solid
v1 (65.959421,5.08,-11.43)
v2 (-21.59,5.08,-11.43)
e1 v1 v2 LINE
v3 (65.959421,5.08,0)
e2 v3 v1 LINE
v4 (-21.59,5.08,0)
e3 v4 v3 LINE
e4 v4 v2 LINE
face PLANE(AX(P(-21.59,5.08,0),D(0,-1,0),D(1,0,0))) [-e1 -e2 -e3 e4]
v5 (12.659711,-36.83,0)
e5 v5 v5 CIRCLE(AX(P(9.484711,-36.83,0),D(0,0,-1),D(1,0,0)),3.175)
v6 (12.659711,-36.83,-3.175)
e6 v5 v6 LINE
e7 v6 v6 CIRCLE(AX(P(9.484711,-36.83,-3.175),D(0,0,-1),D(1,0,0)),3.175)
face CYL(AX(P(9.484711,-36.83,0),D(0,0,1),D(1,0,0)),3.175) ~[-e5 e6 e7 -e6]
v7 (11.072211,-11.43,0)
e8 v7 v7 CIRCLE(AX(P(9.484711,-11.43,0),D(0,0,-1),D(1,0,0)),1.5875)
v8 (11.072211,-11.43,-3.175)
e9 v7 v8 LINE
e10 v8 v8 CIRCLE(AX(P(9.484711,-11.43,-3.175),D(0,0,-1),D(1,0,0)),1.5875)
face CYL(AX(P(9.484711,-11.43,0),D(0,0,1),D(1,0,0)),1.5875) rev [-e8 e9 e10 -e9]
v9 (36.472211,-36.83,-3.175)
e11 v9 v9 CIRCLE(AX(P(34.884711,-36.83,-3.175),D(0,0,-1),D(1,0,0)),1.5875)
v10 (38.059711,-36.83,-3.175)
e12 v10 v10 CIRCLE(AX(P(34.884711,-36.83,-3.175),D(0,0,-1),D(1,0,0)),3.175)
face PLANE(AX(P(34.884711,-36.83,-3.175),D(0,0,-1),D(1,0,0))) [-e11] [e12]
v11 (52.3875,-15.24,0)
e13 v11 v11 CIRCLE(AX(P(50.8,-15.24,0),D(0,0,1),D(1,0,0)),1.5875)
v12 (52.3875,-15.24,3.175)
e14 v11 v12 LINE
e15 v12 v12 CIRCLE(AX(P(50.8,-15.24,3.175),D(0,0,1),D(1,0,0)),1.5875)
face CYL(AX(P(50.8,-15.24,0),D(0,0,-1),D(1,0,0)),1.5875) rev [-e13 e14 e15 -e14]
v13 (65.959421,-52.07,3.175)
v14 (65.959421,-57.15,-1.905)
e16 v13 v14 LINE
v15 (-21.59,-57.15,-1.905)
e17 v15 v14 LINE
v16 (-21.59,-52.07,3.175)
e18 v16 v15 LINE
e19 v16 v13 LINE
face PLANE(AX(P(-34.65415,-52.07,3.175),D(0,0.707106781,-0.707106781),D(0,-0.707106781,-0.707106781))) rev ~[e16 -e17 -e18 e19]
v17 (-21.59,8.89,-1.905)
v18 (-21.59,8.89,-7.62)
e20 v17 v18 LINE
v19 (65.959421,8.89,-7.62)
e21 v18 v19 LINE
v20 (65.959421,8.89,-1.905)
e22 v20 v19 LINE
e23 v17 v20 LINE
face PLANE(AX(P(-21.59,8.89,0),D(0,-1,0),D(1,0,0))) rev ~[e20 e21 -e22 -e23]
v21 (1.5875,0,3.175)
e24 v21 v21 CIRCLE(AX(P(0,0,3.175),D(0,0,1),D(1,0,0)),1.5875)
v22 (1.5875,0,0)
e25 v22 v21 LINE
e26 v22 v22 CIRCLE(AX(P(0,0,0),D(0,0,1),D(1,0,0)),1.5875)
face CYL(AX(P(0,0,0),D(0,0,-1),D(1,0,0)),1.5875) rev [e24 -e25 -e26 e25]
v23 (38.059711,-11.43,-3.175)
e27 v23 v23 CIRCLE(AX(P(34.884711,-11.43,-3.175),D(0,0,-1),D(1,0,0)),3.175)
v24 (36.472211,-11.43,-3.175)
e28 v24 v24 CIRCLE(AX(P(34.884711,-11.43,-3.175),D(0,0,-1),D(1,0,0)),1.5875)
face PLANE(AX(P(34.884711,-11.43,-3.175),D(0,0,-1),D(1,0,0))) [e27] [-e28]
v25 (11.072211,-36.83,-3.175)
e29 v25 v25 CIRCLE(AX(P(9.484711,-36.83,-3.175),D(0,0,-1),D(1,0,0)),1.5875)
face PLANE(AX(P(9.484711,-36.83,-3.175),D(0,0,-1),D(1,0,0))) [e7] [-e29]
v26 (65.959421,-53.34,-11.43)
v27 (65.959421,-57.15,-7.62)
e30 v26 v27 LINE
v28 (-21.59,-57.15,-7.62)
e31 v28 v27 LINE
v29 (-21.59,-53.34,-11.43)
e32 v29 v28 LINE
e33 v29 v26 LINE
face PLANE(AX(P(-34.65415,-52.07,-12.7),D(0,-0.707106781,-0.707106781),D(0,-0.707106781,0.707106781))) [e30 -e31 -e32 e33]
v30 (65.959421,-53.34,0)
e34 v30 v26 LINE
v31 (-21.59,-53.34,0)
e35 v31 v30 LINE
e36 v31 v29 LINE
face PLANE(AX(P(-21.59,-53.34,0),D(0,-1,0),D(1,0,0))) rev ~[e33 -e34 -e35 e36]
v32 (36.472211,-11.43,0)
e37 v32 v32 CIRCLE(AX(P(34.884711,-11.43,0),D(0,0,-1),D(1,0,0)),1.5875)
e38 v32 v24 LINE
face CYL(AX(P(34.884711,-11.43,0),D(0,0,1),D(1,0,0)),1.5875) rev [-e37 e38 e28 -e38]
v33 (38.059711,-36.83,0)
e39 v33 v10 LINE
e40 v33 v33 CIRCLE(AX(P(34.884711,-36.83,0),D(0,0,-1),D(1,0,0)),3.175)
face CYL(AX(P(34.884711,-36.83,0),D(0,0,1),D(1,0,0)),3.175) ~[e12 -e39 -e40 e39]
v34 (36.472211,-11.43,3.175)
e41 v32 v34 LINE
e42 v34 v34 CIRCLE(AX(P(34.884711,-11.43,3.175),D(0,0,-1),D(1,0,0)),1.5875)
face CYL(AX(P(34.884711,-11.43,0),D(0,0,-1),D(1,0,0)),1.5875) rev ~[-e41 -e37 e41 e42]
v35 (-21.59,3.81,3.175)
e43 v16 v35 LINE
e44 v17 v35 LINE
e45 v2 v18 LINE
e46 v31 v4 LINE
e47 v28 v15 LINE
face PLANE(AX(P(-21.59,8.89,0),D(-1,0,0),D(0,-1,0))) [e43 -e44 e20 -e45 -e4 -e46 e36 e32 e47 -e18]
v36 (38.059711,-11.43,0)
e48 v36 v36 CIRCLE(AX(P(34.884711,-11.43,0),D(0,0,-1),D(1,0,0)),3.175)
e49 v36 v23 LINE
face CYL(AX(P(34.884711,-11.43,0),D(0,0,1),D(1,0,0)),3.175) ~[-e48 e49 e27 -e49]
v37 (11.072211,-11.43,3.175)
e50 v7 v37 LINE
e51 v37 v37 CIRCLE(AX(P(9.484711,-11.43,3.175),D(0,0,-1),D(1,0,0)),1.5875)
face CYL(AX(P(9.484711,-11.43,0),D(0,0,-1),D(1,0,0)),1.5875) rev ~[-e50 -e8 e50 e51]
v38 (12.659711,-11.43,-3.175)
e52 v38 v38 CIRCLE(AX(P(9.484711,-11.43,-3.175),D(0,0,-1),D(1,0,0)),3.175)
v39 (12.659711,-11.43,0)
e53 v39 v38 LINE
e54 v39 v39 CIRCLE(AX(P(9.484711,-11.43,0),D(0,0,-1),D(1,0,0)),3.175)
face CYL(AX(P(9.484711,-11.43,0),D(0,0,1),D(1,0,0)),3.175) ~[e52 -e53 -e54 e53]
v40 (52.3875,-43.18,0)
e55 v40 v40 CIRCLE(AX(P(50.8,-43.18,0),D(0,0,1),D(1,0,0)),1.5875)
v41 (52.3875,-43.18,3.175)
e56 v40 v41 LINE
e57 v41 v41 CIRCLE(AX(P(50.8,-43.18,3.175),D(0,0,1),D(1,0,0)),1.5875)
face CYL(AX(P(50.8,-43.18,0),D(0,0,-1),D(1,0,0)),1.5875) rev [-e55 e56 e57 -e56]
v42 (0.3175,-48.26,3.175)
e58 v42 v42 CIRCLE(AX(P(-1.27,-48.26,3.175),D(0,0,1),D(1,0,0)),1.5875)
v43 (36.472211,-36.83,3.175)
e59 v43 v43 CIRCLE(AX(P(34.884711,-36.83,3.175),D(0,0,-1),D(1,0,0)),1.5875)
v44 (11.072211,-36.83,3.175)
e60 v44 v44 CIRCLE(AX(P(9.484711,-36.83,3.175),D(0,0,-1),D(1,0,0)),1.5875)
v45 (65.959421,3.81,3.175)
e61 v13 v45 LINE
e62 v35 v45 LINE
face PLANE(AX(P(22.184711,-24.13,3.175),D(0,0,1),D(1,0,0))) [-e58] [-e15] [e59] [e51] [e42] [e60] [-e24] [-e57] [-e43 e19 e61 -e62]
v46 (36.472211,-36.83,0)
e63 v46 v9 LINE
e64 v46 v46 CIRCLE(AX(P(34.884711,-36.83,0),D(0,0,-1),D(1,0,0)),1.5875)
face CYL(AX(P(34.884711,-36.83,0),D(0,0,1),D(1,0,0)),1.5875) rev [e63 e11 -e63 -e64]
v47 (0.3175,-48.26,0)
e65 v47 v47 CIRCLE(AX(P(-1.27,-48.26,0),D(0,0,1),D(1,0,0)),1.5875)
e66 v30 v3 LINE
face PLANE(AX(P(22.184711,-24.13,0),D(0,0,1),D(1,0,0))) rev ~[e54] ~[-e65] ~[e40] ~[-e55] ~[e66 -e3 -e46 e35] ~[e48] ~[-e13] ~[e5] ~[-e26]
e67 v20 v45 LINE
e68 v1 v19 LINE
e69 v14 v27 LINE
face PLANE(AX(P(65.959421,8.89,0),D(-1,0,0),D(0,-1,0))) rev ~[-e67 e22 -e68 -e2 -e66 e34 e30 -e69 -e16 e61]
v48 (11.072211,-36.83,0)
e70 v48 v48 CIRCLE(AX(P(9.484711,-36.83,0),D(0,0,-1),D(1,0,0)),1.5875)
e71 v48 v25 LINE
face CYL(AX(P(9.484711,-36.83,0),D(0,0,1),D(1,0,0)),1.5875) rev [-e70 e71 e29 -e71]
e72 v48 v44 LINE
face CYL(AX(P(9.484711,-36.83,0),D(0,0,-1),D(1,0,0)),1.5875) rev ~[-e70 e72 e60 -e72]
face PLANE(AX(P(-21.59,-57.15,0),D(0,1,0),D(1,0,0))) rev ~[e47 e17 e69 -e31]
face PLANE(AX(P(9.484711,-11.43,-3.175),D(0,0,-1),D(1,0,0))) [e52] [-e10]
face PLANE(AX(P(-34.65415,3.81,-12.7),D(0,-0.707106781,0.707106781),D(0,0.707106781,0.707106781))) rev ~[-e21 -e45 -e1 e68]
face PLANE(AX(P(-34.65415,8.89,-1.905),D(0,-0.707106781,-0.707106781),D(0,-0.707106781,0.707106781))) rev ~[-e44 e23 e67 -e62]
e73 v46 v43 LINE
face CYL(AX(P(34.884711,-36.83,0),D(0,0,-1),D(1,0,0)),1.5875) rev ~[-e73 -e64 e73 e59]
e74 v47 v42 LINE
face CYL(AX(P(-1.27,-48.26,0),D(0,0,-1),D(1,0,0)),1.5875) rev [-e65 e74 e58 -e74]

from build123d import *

# Parameters (mm, degrees)
F0_W        = 87.5494211584
F0_H        = 66.04
F0_R        = 1.5875
F1_DEPTH    = 3.175
F2_R        = 3.175
F2_R_2      = 1.5875
F3_DEPTH    = 3.175
F4_DEPTH    = 25.4
F5_W        = 87.5494211584
F5_H        = 3.81
F6_DEPTH    = 12.7
F7_T1_DEPTH = 113.6777203162


# Not quite as in the source:
# - a fillet or chamfer that OpenCascade refuses, or shapes differently, is made with other operations: its cross-section is extruded or revolved along the edge and cut away or added


with BuildPart() as f1:
    # F0 (on Top) → F1 (new body)
    with BuildSketch(Plane.XY):
        with Locations((22.1847105792, -24.13)):
            Rectangle(F0_W, F0_H)
        with Locations((-1.27, -48.26)):
            Circle(F0_R, mode=Mode.SUBTRACT)
        with Locations((50.8, -43.18)):
            Circle(F0_R, mode=Mode.SUBTRACT)
        Circle(F0_R, mode=Mode.SUBTRACT)
        with Locations((50.8, -15.24)):
            Circle(F0_R, mode=Mode.SUBTRACT)
    extrude(amount=F1_DEPTH)

    # F2 (on face) → F3 (join)
    with BuildSketch(Plane(origin=(0, 0, 0), x_dir=(1, 0, 0), z_dir=(0, 0, -1))):
        with Locations((9.4847105792, 11.43)):
            Circle(F2_R)
        with Locations((9.4847105792, 11.43)):
            Circle(F2_R_2, mode=Mode.SUBTRACT)
        with Locations((9.4847105792, 36.83)):
            Circle(F2_R)
        with Locations((9.4847105792, 36.83)):
            Circle(F2_R_2, mode=Mode.SUBTRACT)
        with Locations((34.8847105792, 36.83)):
            Circle(F2_R)
        with Locations((34.8847105792, 36.83)):
            Circle(F2_R_2, mode=Mode.SUBTRACT)
        with Locations((34.8847105792, 11.43)):
            Circle(F2_R)
        with Locations((34.8847105792, 11.43)):
            Circle(F2_R_2, mode=Mode.SUBTRACT)
    extrude(amount=F3_DEPTH)

    # F4 (cut): faces of the model
    f4_faces = [f1.faces().sort_by_distance(p)[0] for p in [
        (9.4847105792, -11.43, 0),
        (9.4847105792, -36.83, 0),
        (34.8847105792, -36.83, 0),
        (34.8847105792, -11.43, 0),
    ]]
    extrude(f4_faces, amount=-F4_DEPTH, mode=Mode.SUBTRACT)

    # F5 (on face) → F6 (join)
    with BuildSketch(Plane(origin=(0, 0, 0), x_dir=(1, 0, 0), z_dir=(0, 0, -1))):
        with Locations((22.1847105792, -6.985)):
            Rectangle(F5_W, F5_H)
        with Locations((22.1847105792, 55.245)):
            Rectangle(F5_W, F5_H)
    extrude(amount=F6_DEPTH)

    # F7: chamfer of 5.08 on 4 edges, made by hand

    # F7_s2 → F7_t1 (cut)
    with BuildSketch(Plane.YZ.offset(-34.6541495789)):
        Polygon((8.89, -1.905), (3.81, 3.175), (8.89, 3.175), align=None)
        Polygon((-52.07, 3.175), (-57.15, -1.905), (-57.15, 3.175), align=None)
        Polygon((3.81, -12.7), (8.89, -7.62), (8.89, -12.7), align=None)
        Polygon((-52.07, -12.7), (-57.15, -7.62), (-57.15, -12.7), align=None)
    extrude(amount=F7_T1_DEPTH, mode=Mode.SUBTRACT)


solid = f1.part
